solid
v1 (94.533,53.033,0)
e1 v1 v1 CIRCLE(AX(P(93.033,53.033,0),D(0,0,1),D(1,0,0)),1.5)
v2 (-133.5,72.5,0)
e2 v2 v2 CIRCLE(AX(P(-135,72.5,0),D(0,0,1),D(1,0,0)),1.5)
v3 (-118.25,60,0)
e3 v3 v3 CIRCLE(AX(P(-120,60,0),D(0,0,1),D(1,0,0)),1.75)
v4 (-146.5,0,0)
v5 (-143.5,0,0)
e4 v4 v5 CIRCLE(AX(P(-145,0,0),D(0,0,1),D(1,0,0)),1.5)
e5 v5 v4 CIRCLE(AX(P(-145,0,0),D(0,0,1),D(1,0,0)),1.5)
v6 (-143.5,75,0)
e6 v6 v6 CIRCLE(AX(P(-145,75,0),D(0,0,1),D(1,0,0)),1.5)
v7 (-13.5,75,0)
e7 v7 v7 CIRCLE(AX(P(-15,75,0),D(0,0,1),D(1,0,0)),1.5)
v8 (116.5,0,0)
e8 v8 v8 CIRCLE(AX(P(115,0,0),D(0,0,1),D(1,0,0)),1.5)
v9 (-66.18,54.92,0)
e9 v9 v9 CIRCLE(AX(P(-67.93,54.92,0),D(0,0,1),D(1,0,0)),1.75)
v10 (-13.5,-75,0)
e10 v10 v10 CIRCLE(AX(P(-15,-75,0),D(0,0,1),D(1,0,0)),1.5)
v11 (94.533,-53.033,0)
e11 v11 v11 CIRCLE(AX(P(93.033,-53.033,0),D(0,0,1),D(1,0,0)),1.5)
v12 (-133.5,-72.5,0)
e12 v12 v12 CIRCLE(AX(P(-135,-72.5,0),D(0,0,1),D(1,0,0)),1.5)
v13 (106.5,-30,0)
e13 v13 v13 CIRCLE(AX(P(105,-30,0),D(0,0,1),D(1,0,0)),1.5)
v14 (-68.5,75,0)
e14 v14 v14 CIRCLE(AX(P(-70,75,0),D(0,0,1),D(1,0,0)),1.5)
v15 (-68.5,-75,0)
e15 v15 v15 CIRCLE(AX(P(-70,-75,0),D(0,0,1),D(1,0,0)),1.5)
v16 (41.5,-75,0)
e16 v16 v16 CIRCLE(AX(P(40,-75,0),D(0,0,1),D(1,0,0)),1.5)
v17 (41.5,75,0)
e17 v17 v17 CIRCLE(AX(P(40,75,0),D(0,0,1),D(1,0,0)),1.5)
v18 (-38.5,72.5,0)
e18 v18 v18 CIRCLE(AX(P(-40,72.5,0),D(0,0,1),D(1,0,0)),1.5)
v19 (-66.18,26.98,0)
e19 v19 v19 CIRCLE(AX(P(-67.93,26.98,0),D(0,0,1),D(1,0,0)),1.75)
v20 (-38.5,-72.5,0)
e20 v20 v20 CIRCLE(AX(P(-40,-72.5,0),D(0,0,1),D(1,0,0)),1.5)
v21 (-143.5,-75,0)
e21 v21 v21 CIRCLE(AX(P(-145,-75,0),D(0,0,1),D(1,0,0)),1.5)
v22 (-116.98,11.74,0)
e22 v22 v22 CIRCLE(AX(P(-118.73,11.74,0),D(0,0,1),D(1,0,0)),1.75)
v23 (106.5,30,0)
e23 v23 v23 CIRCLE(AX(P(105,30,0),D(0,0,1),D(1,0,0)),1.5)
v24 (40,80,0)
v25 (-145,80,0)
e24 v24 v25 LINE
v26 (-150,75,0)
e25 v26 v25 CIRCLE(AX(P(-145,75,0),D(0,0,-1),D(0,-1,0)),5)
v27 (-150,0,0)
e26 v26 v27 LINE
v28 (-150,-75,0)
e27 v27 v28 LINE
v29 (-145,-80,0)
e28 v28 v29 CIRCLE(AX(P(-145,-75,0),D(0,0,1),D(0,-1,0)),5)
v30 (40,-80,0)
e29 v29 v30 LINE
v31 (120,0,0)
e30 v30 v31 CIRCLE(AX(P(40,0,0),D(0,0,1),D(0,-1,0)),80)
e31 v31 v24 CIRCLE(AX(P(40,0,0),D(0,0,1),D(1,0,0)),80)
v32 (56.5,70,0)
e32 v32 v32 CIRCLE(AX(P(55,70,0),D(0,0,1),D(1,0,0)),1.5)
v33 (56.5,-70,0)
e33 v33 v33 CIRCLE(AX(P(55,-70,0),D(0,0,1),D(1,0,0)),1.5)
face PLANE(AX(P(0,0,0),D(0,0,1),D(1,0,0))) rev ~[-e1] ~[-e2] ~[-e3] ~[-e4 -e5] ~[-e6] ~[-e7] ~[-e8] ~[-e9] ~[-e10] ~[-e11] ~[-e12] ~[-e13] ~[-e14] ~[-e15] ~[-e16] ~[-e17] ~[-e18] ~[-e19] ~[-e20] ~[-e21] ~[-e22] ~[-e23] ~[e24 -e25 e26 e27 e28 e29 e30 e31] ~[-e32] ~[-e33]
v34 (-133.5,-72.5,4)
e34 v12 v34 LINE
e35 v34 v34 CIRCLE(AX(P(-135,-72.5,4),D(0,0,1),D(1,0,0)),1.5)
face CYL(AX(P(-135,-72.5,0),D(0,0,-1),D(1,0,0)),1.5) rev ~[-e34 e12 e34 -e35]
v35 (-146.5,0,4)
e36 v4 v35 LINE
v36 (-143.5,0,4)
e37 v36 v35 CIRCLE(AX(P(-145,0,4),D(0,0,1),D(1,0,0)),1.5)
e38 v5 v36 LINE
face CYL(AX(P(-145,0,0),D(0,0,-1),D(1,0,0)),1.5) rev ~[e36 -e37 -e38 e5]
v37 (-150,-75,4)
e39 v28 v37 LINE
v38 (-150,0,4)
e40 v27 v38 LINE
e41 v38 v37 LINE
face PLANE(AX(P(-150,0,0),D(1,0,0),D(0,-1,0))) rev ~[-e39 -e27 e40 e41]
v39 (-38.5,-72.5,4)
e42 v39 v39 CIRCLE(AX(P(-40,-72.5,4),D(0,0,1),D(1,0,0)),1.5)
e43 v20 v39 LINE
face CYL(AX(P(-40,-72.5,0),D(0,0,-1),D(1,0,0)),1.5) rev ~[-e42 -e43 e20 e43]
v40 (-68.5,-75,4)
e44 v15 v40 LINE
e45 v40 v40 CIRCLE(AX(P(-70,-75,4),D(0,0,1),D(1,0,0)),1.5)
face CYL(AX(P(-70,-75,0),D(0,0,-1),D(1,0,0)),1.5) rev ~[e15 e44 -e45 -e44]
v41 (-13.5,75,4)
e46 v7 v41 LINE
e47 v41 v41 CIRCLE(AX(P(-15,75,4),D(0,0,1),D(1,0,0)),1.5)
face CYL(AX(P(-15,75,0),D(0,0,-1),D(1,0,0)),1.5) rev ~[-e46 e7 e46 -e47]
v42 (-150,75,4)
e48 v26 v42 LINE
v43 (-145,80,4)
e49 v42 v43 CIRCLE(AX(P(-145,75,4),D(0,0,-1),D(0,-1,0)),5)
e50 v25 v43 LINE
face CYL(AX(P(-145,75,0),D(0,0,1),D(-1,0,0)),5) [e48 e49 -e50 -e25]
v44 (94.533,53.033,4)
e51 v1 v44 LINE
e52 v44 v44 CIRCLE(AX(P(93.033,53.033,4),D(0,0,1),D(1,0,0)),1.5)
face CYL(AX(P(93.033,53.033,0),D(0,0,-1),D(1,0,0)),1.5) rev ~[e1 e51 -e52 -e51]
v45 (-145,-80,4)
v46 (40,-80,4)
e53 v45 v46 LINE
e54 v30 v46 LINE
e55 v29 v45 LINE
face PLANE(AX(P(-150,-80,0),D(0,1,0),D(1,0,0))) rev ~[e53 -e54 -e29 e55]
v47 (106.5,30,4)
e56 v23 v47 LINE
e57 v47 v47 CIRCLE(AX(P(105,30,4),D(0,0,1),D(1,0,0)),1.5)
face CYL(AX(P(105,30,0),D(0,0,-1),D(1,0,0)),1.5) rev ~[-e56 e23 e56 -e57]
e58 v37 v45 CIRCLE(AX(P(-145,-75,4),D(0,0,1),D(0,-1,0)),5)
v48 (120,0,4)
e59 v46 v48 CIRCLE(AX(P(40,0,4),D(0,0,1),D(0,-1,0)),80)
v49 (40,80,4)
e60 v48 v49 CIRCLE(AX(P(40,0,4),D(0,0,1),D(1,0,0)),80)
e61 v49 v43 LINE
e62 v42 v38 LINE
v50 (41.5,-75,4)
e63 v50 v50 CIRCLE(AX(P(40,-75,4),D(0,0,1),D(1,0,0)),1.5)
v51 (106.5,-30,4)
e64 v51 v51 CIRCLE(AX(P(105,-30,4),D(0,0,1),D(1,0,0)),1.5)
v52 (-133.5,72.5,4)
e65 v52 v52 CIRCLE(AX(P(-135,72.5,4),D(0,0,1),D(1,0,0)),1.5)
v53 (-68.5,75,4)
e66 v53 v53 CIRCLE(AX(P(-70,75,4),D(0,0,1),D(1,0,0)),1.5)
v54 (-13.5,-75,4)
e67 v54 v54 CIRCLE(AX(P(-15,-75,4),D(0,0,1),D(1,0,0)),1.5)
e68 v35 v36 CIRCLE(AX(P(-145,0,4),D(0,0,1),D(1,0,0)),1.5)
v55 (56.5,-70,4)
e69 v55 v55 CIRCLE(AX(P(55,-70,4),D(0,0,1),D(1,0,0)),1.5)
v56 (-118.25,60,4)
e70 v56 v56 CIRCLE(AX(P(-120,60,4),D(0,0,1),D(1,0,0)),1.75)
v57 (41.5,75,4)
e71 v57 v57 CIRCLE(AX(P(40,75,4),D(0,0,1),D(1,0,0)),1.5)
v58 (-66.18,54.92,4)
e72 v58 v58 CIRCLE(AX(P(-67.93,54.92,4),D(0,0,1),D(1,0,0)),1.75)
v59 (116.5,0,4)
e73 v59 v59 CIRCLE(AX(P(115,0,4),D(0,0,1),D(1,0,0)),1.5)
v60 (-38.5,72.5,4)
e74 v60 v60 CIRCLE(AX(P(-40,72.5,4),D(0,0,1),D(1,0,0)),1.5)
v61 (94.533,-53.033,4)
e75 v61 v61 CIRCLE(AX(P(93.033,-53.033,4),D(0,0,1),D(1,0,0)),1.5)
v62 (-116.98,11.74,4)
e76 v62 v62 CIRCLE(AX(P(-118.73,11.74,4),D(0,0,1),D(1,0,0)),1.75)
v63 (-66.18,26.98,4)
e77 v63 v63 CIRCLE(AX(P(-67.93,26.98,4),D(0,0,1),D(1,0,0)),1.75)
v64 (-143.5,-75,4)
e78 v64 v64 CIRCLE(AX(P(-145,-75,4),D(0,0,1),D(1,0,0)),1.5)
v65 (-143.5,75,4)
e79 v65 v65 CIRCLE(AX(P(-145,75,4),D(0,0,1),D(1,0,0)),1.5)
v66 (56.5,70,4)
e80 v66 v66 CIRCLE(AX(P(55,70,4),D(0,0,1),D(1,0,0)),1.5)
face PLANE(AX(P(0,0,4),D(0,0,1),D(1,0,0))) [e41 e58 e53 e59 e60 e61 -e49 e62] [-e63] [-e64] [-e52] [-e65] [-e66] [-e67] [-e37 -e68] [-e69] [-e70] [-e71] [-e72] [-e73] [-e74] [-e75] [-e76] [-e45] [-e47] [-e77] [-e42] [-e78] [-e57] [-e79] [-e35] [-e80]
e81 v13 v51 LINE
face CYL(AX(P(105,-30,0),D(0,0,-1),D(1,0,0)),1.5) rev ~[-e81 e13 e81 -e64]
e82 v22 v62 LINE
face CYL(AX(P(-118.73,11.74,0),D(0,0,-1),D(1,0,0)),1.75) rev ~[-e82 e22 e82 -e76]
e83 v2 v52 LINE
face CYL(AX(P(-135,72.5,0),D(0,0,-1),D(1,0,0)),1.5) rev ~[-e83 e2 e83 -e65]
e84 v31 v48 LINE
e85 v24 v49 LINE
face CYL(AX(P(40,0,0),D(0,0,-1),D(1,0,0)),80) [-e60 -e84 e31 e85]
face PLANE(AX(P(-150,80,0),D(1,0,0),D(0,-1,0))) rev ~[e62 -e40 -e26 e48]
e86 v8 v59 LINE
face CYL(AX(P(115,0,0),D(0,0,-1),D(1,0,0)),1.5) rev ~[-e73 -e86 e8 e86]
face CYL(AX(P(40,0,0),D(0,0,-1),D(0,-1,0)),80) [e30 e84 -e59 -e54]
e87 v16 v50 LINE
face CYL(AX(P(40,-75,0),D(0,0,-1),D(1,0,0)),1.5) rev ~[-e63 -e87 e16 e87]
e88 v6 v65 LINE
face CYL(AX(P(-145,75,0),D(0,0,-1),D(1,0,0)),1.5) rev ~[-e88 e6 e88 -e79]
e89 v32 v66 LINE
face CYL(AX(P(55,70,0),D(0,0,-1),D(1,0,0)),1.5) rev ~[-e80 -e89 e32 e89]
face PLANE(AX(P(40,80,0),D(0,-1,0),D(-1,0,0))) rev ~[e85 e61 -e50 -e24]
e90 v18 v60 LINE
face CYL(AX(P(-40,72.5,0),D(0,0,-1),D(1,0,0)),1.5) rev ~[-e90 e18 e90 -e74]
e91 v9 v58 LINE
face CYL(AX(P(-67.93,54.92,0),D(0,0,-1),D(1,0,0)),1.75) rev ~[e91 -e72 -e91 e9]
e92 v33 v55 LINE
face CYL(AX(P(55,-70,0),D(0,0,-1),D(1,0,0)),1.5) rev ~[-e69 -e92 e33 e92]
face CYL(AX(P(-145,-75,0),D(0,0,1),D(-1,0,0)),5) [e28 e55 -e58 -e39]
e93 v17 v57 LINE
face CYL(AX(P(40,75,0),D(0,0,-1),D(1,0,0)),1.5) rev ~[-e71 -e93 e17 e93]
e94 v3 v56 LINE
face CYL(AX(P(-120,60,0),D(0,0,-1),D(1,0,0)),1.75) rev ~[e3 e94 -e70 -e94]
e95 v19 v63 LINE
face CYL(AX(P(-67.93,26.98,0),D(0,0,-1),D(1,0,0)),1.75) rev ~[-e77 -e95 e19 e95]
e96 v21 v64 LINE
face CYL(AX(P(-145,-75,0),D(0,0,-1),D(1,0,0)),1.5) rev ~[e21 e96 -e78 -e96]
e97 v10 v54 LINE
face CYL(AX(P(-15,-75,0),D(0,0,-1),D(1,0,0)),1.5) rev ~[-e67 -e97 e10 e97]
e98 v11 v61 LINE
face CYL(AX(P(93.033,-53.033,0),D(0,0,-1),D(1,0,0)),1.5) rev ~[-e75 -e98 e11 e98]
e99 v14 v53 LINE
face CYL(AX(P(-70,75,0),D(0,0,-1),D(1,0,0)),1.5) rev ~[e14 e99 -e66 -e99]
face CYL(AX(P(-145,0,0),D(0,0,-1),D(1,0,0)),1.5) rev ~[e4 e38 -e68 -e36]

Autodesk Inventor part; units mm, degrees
ref_plane "YZ Plane" through (0, 0, 0) normal (1, 0, 0) x (0, 1, 0)
ref_plane "XZ Plane" through (0, 0, 0) normal (0, 1, 0) x (-1, 0, 0)
ref_plane "XY Plane" through (0, 0, 0) normal (0, 0, 1) x (1, 0, 0)
sketch "Sketch1" plane through (0, 0, 0) normal (0, 0, 1) x (1, 0, 0)
  line L0 (-150, -80) -> (40, -80)
  line L1 (150, -80) -> (150, 80) construction
  line L2 (40, 80) -> (-150, 80)
  line L3 (-150, 80) -> (-150, -80)
  line L4 (-150, -80) -> (150, 80) construction
  line L5 (150, -80) -> (-150, 80) construction
  line L6 (-150, 0) -> (-107, 0) construction
  line L7 (-107, 0) -> (33.79, 0) construction
  line L8 (-7.3128, 0) -> (74.6872, 0) construction
  line L9 (33.6872, 41) -> (74.6872, 41) construction
  line L10 (74.6872, 41) -> (74.6872, 0) construction
  circle A0 centre (74.6872, 41) radius 2 construction
  circle A1 centre (74.6872, -41) radius 2 construction
  circle A2 centre (-7.3128, 41) radius 2 construction
  circle A3 centre (-7.3128, -41) radius 2 construction
  line L11 (150, 0) -> (120, 0) construction
  line L12 (120, 0) -> (120, 0)
  arc A4 (40, -80) -> (120, 0) centre (40, 0) ccw
  arc A5 (120, 0) -> (40, 80) centre (40, 0) ccw
  line L13 (120, 0) -> (115, 0) construction
  circle A6 centre (115, 0) radius 1.5
  line L14 (40, 0) -> (111.7631, 71.7631) construction
  line L15 (96.5685, -56.5685) -> (93.033, -53.033) construction
  circle A7 centre (93.033, -53.033) radius 1.5
  line L16 (40, -80) -> (40, -75) construction
  circle A8 centre (40, -75) radius 1.5
  line L17 (40, -75) -> (-15, -75) construction
  line L18 (-15, -75) -> (-70, -75) construction
  line L19 (-150, -75) -> (-145, -75) construction
  circle A9 centre (-15, -75) radius 1.5
  circle A10 centre (-70, -75) radius 1.5
  circle A11 centre (-145, -75) radius 1.5
  circle A12 centre (-145, 0) radius 1.5
  circle A13 centre (93.033, 53.033) radius 1.5
  circle A14 centre (40, 75) radius 1.5
  circle A15 centre (-15, 75) radius 1.5
  circle A16 centre (-70, 75) radius 1.5
  circle A17 centre (-145, 75) radius 1.5
  line L20 (-145, -80) -> (-145, -75) construction
  line L21 (-150, 0) -> (-145, 0)
  line L22 (120, 0) -> (105, 0) construction
  line L23 (105, -30) -> (105, 30) construction
  circle A18 centre (105, -30) radius 4 construction
  circle A19 centre (105, 30) radius 4 construction
  circle A20 centre (105, -30) radius 1.5
  circle A21 centre (105, 30) radius 1.5
  line L24 (105, 0) -> (55, 0) construction
  line L25 (55, -70) -> (55, 70) construction
  circle A22 centre (55, -70) radius 1.5
  circle A23 centre (55, -70) radius 4 construction
  line L26 (-150, 0) -> (-135, 0) construction
  line L27 (-135, -72.5) -> (-135, 72.5) construction
  circle A24 centre (-135, -72.5) radius 1.5
  circle A25 centre (-135, -72.5) radius 4 construction
  line L28 (-135, 0) -> (-40, 0) construction
  line L29 (-40, -72.5) -> (-40, 72.5) construction
  circle A26 centre (-40, -72.5) radius 4 construction
  circle A27 centre (-40, -72.5) radius 1.5
  circle A28 centre (55, 70) radius 1.5
  circle A29 centre (55, 70) radius 4 construction
  circle A30 centre (-135, 72.5) radius 1.5
  circle A31 centre (-135, 72.5) radius 4 construction
  circle A32 centre (-40, 72.5) radius 4 construction
  circle A33 centre (-40, 72.5) radius 1.5
  line L30 (-150, 60) -> (-120, 60) construction
  line L31 (-120, 80) -> (-120, 60) construction
  circle A34 centre (-120, 60) radius 1.75
  circle A35 centre (-118.73, 11.74) radius 1.75
  line L32 (-120, 60) -> (-67.93, 60) construction
  line L33 (-150, 11.74) -> (-118.73, 11.74) construction
  line L34 (-118.73, 60) -> (-118.73, 11.74) construction
  line L35 (-67.93, 60) -> (-67.93, 54.92) construction
  circle A36 centre (-67.93, 54.92) radius 1.75
  line L36 (-67.93, 54.92) -> (-67.93, 26.98) construction
  circle A37 centre (-67.93, 26.98) radius 1.75
  point P0 (0, 0)
  point P1 (120, -80)
  point P2 (120, 0)
  dimension "d0" = 300
  dimension "d1" = 160
  dimension "d4" = 43
  dimension "d6" = 140.79
  dimension "d9" = 82
  dimension "d11" = 4
  dimension "d47" = 30
  dimension "d49" = 80
  dimension "LF" = 5
  dimension "Furos" = 3
  dimension "d52" = 45
  dimension "d53" = 5
  dimension "d55" = 3
  dimension "d56" = 5
  dimension "d57" = 3
  dimension "d58" = 55
  dimension "d59" = 55
  dimension "d60" = 5
  dimension "d61" = 3
  dimension "d62" = 3
  dimension "d63" = 3
  dimension "d64" = 3
  dimension "d65" = 5
  dimension "d66" = 5
  dimension "d67" = 15
  dimension "d68" = 60
  dimension "d69" = 8
  dimension "d70" = 8
  dimension "d71" = 3
  dimension "FA" = 3
  dimension "d73" = 50
  dimension "d74" = 140
  dimension "d75" = 3
  dimension "AA" = 8
  dimension "d77" = 15
  dimension "d78" = 145
  dimension "d79" = 3
  dimension "d80" = 8
  dimension "d81" = 95
  dimension "d82" = 145
  dimension "d83" = 8
  dimension "d84" = 3
  dimension "d85" = 30
  dimension "d86" = 20
  dimension "d87" = 3.5
  dimension "d89" = 3.5
  dimension "d90" = 52.07
  dimension "d94" = 31.27
  dimension "d95" = 48.26
  dimension "d96" = 5.08
  dimension "d97" = 3.5
  dimension "d98" = 27.94
  dimension "d99" = 3.5
  dimension "d100" = 41
  dimension "d101" = 41
  dimension "d103" = 74.6872
  dimension "d104" = 82
  dimension "d105" = 41
extrude "Extrusion1" add sketch "Sketch1" along normal blind 4
fillet "Fillet1" radius 5 2 edges at (-150, -80, 2) (-150, 80, 2)
equation "\"d9\" = L_furos"
equation "\"d53\" = LF"
equation "\"d55\" = Furos"
equation "\"d56\" = LF"
equation "\"d57\" = Furos"
equation "\"d60\" = LF"
equation "\"d61\" = Furos"
equation "\"d62\" = Furos"
equation "\"d63\" = Furos"
equation "\"d64\" = Furos"
equation "\"d65\" = LF"
equation "\"d66\" = LF"
equation "\"d69\" = AA"
equation "\"d70\" = AA"
equation "\"d71\" = FA"
equation "\"d75\" = FA"
equation "\"d79\" = FA"
equation "\"d80\" = AA"
equation "\"d83\" = AA"
equation "\"d84\" = FA"
equation "\"L_furos\" = 82"
properties part number "Base_solida_Down_test"
